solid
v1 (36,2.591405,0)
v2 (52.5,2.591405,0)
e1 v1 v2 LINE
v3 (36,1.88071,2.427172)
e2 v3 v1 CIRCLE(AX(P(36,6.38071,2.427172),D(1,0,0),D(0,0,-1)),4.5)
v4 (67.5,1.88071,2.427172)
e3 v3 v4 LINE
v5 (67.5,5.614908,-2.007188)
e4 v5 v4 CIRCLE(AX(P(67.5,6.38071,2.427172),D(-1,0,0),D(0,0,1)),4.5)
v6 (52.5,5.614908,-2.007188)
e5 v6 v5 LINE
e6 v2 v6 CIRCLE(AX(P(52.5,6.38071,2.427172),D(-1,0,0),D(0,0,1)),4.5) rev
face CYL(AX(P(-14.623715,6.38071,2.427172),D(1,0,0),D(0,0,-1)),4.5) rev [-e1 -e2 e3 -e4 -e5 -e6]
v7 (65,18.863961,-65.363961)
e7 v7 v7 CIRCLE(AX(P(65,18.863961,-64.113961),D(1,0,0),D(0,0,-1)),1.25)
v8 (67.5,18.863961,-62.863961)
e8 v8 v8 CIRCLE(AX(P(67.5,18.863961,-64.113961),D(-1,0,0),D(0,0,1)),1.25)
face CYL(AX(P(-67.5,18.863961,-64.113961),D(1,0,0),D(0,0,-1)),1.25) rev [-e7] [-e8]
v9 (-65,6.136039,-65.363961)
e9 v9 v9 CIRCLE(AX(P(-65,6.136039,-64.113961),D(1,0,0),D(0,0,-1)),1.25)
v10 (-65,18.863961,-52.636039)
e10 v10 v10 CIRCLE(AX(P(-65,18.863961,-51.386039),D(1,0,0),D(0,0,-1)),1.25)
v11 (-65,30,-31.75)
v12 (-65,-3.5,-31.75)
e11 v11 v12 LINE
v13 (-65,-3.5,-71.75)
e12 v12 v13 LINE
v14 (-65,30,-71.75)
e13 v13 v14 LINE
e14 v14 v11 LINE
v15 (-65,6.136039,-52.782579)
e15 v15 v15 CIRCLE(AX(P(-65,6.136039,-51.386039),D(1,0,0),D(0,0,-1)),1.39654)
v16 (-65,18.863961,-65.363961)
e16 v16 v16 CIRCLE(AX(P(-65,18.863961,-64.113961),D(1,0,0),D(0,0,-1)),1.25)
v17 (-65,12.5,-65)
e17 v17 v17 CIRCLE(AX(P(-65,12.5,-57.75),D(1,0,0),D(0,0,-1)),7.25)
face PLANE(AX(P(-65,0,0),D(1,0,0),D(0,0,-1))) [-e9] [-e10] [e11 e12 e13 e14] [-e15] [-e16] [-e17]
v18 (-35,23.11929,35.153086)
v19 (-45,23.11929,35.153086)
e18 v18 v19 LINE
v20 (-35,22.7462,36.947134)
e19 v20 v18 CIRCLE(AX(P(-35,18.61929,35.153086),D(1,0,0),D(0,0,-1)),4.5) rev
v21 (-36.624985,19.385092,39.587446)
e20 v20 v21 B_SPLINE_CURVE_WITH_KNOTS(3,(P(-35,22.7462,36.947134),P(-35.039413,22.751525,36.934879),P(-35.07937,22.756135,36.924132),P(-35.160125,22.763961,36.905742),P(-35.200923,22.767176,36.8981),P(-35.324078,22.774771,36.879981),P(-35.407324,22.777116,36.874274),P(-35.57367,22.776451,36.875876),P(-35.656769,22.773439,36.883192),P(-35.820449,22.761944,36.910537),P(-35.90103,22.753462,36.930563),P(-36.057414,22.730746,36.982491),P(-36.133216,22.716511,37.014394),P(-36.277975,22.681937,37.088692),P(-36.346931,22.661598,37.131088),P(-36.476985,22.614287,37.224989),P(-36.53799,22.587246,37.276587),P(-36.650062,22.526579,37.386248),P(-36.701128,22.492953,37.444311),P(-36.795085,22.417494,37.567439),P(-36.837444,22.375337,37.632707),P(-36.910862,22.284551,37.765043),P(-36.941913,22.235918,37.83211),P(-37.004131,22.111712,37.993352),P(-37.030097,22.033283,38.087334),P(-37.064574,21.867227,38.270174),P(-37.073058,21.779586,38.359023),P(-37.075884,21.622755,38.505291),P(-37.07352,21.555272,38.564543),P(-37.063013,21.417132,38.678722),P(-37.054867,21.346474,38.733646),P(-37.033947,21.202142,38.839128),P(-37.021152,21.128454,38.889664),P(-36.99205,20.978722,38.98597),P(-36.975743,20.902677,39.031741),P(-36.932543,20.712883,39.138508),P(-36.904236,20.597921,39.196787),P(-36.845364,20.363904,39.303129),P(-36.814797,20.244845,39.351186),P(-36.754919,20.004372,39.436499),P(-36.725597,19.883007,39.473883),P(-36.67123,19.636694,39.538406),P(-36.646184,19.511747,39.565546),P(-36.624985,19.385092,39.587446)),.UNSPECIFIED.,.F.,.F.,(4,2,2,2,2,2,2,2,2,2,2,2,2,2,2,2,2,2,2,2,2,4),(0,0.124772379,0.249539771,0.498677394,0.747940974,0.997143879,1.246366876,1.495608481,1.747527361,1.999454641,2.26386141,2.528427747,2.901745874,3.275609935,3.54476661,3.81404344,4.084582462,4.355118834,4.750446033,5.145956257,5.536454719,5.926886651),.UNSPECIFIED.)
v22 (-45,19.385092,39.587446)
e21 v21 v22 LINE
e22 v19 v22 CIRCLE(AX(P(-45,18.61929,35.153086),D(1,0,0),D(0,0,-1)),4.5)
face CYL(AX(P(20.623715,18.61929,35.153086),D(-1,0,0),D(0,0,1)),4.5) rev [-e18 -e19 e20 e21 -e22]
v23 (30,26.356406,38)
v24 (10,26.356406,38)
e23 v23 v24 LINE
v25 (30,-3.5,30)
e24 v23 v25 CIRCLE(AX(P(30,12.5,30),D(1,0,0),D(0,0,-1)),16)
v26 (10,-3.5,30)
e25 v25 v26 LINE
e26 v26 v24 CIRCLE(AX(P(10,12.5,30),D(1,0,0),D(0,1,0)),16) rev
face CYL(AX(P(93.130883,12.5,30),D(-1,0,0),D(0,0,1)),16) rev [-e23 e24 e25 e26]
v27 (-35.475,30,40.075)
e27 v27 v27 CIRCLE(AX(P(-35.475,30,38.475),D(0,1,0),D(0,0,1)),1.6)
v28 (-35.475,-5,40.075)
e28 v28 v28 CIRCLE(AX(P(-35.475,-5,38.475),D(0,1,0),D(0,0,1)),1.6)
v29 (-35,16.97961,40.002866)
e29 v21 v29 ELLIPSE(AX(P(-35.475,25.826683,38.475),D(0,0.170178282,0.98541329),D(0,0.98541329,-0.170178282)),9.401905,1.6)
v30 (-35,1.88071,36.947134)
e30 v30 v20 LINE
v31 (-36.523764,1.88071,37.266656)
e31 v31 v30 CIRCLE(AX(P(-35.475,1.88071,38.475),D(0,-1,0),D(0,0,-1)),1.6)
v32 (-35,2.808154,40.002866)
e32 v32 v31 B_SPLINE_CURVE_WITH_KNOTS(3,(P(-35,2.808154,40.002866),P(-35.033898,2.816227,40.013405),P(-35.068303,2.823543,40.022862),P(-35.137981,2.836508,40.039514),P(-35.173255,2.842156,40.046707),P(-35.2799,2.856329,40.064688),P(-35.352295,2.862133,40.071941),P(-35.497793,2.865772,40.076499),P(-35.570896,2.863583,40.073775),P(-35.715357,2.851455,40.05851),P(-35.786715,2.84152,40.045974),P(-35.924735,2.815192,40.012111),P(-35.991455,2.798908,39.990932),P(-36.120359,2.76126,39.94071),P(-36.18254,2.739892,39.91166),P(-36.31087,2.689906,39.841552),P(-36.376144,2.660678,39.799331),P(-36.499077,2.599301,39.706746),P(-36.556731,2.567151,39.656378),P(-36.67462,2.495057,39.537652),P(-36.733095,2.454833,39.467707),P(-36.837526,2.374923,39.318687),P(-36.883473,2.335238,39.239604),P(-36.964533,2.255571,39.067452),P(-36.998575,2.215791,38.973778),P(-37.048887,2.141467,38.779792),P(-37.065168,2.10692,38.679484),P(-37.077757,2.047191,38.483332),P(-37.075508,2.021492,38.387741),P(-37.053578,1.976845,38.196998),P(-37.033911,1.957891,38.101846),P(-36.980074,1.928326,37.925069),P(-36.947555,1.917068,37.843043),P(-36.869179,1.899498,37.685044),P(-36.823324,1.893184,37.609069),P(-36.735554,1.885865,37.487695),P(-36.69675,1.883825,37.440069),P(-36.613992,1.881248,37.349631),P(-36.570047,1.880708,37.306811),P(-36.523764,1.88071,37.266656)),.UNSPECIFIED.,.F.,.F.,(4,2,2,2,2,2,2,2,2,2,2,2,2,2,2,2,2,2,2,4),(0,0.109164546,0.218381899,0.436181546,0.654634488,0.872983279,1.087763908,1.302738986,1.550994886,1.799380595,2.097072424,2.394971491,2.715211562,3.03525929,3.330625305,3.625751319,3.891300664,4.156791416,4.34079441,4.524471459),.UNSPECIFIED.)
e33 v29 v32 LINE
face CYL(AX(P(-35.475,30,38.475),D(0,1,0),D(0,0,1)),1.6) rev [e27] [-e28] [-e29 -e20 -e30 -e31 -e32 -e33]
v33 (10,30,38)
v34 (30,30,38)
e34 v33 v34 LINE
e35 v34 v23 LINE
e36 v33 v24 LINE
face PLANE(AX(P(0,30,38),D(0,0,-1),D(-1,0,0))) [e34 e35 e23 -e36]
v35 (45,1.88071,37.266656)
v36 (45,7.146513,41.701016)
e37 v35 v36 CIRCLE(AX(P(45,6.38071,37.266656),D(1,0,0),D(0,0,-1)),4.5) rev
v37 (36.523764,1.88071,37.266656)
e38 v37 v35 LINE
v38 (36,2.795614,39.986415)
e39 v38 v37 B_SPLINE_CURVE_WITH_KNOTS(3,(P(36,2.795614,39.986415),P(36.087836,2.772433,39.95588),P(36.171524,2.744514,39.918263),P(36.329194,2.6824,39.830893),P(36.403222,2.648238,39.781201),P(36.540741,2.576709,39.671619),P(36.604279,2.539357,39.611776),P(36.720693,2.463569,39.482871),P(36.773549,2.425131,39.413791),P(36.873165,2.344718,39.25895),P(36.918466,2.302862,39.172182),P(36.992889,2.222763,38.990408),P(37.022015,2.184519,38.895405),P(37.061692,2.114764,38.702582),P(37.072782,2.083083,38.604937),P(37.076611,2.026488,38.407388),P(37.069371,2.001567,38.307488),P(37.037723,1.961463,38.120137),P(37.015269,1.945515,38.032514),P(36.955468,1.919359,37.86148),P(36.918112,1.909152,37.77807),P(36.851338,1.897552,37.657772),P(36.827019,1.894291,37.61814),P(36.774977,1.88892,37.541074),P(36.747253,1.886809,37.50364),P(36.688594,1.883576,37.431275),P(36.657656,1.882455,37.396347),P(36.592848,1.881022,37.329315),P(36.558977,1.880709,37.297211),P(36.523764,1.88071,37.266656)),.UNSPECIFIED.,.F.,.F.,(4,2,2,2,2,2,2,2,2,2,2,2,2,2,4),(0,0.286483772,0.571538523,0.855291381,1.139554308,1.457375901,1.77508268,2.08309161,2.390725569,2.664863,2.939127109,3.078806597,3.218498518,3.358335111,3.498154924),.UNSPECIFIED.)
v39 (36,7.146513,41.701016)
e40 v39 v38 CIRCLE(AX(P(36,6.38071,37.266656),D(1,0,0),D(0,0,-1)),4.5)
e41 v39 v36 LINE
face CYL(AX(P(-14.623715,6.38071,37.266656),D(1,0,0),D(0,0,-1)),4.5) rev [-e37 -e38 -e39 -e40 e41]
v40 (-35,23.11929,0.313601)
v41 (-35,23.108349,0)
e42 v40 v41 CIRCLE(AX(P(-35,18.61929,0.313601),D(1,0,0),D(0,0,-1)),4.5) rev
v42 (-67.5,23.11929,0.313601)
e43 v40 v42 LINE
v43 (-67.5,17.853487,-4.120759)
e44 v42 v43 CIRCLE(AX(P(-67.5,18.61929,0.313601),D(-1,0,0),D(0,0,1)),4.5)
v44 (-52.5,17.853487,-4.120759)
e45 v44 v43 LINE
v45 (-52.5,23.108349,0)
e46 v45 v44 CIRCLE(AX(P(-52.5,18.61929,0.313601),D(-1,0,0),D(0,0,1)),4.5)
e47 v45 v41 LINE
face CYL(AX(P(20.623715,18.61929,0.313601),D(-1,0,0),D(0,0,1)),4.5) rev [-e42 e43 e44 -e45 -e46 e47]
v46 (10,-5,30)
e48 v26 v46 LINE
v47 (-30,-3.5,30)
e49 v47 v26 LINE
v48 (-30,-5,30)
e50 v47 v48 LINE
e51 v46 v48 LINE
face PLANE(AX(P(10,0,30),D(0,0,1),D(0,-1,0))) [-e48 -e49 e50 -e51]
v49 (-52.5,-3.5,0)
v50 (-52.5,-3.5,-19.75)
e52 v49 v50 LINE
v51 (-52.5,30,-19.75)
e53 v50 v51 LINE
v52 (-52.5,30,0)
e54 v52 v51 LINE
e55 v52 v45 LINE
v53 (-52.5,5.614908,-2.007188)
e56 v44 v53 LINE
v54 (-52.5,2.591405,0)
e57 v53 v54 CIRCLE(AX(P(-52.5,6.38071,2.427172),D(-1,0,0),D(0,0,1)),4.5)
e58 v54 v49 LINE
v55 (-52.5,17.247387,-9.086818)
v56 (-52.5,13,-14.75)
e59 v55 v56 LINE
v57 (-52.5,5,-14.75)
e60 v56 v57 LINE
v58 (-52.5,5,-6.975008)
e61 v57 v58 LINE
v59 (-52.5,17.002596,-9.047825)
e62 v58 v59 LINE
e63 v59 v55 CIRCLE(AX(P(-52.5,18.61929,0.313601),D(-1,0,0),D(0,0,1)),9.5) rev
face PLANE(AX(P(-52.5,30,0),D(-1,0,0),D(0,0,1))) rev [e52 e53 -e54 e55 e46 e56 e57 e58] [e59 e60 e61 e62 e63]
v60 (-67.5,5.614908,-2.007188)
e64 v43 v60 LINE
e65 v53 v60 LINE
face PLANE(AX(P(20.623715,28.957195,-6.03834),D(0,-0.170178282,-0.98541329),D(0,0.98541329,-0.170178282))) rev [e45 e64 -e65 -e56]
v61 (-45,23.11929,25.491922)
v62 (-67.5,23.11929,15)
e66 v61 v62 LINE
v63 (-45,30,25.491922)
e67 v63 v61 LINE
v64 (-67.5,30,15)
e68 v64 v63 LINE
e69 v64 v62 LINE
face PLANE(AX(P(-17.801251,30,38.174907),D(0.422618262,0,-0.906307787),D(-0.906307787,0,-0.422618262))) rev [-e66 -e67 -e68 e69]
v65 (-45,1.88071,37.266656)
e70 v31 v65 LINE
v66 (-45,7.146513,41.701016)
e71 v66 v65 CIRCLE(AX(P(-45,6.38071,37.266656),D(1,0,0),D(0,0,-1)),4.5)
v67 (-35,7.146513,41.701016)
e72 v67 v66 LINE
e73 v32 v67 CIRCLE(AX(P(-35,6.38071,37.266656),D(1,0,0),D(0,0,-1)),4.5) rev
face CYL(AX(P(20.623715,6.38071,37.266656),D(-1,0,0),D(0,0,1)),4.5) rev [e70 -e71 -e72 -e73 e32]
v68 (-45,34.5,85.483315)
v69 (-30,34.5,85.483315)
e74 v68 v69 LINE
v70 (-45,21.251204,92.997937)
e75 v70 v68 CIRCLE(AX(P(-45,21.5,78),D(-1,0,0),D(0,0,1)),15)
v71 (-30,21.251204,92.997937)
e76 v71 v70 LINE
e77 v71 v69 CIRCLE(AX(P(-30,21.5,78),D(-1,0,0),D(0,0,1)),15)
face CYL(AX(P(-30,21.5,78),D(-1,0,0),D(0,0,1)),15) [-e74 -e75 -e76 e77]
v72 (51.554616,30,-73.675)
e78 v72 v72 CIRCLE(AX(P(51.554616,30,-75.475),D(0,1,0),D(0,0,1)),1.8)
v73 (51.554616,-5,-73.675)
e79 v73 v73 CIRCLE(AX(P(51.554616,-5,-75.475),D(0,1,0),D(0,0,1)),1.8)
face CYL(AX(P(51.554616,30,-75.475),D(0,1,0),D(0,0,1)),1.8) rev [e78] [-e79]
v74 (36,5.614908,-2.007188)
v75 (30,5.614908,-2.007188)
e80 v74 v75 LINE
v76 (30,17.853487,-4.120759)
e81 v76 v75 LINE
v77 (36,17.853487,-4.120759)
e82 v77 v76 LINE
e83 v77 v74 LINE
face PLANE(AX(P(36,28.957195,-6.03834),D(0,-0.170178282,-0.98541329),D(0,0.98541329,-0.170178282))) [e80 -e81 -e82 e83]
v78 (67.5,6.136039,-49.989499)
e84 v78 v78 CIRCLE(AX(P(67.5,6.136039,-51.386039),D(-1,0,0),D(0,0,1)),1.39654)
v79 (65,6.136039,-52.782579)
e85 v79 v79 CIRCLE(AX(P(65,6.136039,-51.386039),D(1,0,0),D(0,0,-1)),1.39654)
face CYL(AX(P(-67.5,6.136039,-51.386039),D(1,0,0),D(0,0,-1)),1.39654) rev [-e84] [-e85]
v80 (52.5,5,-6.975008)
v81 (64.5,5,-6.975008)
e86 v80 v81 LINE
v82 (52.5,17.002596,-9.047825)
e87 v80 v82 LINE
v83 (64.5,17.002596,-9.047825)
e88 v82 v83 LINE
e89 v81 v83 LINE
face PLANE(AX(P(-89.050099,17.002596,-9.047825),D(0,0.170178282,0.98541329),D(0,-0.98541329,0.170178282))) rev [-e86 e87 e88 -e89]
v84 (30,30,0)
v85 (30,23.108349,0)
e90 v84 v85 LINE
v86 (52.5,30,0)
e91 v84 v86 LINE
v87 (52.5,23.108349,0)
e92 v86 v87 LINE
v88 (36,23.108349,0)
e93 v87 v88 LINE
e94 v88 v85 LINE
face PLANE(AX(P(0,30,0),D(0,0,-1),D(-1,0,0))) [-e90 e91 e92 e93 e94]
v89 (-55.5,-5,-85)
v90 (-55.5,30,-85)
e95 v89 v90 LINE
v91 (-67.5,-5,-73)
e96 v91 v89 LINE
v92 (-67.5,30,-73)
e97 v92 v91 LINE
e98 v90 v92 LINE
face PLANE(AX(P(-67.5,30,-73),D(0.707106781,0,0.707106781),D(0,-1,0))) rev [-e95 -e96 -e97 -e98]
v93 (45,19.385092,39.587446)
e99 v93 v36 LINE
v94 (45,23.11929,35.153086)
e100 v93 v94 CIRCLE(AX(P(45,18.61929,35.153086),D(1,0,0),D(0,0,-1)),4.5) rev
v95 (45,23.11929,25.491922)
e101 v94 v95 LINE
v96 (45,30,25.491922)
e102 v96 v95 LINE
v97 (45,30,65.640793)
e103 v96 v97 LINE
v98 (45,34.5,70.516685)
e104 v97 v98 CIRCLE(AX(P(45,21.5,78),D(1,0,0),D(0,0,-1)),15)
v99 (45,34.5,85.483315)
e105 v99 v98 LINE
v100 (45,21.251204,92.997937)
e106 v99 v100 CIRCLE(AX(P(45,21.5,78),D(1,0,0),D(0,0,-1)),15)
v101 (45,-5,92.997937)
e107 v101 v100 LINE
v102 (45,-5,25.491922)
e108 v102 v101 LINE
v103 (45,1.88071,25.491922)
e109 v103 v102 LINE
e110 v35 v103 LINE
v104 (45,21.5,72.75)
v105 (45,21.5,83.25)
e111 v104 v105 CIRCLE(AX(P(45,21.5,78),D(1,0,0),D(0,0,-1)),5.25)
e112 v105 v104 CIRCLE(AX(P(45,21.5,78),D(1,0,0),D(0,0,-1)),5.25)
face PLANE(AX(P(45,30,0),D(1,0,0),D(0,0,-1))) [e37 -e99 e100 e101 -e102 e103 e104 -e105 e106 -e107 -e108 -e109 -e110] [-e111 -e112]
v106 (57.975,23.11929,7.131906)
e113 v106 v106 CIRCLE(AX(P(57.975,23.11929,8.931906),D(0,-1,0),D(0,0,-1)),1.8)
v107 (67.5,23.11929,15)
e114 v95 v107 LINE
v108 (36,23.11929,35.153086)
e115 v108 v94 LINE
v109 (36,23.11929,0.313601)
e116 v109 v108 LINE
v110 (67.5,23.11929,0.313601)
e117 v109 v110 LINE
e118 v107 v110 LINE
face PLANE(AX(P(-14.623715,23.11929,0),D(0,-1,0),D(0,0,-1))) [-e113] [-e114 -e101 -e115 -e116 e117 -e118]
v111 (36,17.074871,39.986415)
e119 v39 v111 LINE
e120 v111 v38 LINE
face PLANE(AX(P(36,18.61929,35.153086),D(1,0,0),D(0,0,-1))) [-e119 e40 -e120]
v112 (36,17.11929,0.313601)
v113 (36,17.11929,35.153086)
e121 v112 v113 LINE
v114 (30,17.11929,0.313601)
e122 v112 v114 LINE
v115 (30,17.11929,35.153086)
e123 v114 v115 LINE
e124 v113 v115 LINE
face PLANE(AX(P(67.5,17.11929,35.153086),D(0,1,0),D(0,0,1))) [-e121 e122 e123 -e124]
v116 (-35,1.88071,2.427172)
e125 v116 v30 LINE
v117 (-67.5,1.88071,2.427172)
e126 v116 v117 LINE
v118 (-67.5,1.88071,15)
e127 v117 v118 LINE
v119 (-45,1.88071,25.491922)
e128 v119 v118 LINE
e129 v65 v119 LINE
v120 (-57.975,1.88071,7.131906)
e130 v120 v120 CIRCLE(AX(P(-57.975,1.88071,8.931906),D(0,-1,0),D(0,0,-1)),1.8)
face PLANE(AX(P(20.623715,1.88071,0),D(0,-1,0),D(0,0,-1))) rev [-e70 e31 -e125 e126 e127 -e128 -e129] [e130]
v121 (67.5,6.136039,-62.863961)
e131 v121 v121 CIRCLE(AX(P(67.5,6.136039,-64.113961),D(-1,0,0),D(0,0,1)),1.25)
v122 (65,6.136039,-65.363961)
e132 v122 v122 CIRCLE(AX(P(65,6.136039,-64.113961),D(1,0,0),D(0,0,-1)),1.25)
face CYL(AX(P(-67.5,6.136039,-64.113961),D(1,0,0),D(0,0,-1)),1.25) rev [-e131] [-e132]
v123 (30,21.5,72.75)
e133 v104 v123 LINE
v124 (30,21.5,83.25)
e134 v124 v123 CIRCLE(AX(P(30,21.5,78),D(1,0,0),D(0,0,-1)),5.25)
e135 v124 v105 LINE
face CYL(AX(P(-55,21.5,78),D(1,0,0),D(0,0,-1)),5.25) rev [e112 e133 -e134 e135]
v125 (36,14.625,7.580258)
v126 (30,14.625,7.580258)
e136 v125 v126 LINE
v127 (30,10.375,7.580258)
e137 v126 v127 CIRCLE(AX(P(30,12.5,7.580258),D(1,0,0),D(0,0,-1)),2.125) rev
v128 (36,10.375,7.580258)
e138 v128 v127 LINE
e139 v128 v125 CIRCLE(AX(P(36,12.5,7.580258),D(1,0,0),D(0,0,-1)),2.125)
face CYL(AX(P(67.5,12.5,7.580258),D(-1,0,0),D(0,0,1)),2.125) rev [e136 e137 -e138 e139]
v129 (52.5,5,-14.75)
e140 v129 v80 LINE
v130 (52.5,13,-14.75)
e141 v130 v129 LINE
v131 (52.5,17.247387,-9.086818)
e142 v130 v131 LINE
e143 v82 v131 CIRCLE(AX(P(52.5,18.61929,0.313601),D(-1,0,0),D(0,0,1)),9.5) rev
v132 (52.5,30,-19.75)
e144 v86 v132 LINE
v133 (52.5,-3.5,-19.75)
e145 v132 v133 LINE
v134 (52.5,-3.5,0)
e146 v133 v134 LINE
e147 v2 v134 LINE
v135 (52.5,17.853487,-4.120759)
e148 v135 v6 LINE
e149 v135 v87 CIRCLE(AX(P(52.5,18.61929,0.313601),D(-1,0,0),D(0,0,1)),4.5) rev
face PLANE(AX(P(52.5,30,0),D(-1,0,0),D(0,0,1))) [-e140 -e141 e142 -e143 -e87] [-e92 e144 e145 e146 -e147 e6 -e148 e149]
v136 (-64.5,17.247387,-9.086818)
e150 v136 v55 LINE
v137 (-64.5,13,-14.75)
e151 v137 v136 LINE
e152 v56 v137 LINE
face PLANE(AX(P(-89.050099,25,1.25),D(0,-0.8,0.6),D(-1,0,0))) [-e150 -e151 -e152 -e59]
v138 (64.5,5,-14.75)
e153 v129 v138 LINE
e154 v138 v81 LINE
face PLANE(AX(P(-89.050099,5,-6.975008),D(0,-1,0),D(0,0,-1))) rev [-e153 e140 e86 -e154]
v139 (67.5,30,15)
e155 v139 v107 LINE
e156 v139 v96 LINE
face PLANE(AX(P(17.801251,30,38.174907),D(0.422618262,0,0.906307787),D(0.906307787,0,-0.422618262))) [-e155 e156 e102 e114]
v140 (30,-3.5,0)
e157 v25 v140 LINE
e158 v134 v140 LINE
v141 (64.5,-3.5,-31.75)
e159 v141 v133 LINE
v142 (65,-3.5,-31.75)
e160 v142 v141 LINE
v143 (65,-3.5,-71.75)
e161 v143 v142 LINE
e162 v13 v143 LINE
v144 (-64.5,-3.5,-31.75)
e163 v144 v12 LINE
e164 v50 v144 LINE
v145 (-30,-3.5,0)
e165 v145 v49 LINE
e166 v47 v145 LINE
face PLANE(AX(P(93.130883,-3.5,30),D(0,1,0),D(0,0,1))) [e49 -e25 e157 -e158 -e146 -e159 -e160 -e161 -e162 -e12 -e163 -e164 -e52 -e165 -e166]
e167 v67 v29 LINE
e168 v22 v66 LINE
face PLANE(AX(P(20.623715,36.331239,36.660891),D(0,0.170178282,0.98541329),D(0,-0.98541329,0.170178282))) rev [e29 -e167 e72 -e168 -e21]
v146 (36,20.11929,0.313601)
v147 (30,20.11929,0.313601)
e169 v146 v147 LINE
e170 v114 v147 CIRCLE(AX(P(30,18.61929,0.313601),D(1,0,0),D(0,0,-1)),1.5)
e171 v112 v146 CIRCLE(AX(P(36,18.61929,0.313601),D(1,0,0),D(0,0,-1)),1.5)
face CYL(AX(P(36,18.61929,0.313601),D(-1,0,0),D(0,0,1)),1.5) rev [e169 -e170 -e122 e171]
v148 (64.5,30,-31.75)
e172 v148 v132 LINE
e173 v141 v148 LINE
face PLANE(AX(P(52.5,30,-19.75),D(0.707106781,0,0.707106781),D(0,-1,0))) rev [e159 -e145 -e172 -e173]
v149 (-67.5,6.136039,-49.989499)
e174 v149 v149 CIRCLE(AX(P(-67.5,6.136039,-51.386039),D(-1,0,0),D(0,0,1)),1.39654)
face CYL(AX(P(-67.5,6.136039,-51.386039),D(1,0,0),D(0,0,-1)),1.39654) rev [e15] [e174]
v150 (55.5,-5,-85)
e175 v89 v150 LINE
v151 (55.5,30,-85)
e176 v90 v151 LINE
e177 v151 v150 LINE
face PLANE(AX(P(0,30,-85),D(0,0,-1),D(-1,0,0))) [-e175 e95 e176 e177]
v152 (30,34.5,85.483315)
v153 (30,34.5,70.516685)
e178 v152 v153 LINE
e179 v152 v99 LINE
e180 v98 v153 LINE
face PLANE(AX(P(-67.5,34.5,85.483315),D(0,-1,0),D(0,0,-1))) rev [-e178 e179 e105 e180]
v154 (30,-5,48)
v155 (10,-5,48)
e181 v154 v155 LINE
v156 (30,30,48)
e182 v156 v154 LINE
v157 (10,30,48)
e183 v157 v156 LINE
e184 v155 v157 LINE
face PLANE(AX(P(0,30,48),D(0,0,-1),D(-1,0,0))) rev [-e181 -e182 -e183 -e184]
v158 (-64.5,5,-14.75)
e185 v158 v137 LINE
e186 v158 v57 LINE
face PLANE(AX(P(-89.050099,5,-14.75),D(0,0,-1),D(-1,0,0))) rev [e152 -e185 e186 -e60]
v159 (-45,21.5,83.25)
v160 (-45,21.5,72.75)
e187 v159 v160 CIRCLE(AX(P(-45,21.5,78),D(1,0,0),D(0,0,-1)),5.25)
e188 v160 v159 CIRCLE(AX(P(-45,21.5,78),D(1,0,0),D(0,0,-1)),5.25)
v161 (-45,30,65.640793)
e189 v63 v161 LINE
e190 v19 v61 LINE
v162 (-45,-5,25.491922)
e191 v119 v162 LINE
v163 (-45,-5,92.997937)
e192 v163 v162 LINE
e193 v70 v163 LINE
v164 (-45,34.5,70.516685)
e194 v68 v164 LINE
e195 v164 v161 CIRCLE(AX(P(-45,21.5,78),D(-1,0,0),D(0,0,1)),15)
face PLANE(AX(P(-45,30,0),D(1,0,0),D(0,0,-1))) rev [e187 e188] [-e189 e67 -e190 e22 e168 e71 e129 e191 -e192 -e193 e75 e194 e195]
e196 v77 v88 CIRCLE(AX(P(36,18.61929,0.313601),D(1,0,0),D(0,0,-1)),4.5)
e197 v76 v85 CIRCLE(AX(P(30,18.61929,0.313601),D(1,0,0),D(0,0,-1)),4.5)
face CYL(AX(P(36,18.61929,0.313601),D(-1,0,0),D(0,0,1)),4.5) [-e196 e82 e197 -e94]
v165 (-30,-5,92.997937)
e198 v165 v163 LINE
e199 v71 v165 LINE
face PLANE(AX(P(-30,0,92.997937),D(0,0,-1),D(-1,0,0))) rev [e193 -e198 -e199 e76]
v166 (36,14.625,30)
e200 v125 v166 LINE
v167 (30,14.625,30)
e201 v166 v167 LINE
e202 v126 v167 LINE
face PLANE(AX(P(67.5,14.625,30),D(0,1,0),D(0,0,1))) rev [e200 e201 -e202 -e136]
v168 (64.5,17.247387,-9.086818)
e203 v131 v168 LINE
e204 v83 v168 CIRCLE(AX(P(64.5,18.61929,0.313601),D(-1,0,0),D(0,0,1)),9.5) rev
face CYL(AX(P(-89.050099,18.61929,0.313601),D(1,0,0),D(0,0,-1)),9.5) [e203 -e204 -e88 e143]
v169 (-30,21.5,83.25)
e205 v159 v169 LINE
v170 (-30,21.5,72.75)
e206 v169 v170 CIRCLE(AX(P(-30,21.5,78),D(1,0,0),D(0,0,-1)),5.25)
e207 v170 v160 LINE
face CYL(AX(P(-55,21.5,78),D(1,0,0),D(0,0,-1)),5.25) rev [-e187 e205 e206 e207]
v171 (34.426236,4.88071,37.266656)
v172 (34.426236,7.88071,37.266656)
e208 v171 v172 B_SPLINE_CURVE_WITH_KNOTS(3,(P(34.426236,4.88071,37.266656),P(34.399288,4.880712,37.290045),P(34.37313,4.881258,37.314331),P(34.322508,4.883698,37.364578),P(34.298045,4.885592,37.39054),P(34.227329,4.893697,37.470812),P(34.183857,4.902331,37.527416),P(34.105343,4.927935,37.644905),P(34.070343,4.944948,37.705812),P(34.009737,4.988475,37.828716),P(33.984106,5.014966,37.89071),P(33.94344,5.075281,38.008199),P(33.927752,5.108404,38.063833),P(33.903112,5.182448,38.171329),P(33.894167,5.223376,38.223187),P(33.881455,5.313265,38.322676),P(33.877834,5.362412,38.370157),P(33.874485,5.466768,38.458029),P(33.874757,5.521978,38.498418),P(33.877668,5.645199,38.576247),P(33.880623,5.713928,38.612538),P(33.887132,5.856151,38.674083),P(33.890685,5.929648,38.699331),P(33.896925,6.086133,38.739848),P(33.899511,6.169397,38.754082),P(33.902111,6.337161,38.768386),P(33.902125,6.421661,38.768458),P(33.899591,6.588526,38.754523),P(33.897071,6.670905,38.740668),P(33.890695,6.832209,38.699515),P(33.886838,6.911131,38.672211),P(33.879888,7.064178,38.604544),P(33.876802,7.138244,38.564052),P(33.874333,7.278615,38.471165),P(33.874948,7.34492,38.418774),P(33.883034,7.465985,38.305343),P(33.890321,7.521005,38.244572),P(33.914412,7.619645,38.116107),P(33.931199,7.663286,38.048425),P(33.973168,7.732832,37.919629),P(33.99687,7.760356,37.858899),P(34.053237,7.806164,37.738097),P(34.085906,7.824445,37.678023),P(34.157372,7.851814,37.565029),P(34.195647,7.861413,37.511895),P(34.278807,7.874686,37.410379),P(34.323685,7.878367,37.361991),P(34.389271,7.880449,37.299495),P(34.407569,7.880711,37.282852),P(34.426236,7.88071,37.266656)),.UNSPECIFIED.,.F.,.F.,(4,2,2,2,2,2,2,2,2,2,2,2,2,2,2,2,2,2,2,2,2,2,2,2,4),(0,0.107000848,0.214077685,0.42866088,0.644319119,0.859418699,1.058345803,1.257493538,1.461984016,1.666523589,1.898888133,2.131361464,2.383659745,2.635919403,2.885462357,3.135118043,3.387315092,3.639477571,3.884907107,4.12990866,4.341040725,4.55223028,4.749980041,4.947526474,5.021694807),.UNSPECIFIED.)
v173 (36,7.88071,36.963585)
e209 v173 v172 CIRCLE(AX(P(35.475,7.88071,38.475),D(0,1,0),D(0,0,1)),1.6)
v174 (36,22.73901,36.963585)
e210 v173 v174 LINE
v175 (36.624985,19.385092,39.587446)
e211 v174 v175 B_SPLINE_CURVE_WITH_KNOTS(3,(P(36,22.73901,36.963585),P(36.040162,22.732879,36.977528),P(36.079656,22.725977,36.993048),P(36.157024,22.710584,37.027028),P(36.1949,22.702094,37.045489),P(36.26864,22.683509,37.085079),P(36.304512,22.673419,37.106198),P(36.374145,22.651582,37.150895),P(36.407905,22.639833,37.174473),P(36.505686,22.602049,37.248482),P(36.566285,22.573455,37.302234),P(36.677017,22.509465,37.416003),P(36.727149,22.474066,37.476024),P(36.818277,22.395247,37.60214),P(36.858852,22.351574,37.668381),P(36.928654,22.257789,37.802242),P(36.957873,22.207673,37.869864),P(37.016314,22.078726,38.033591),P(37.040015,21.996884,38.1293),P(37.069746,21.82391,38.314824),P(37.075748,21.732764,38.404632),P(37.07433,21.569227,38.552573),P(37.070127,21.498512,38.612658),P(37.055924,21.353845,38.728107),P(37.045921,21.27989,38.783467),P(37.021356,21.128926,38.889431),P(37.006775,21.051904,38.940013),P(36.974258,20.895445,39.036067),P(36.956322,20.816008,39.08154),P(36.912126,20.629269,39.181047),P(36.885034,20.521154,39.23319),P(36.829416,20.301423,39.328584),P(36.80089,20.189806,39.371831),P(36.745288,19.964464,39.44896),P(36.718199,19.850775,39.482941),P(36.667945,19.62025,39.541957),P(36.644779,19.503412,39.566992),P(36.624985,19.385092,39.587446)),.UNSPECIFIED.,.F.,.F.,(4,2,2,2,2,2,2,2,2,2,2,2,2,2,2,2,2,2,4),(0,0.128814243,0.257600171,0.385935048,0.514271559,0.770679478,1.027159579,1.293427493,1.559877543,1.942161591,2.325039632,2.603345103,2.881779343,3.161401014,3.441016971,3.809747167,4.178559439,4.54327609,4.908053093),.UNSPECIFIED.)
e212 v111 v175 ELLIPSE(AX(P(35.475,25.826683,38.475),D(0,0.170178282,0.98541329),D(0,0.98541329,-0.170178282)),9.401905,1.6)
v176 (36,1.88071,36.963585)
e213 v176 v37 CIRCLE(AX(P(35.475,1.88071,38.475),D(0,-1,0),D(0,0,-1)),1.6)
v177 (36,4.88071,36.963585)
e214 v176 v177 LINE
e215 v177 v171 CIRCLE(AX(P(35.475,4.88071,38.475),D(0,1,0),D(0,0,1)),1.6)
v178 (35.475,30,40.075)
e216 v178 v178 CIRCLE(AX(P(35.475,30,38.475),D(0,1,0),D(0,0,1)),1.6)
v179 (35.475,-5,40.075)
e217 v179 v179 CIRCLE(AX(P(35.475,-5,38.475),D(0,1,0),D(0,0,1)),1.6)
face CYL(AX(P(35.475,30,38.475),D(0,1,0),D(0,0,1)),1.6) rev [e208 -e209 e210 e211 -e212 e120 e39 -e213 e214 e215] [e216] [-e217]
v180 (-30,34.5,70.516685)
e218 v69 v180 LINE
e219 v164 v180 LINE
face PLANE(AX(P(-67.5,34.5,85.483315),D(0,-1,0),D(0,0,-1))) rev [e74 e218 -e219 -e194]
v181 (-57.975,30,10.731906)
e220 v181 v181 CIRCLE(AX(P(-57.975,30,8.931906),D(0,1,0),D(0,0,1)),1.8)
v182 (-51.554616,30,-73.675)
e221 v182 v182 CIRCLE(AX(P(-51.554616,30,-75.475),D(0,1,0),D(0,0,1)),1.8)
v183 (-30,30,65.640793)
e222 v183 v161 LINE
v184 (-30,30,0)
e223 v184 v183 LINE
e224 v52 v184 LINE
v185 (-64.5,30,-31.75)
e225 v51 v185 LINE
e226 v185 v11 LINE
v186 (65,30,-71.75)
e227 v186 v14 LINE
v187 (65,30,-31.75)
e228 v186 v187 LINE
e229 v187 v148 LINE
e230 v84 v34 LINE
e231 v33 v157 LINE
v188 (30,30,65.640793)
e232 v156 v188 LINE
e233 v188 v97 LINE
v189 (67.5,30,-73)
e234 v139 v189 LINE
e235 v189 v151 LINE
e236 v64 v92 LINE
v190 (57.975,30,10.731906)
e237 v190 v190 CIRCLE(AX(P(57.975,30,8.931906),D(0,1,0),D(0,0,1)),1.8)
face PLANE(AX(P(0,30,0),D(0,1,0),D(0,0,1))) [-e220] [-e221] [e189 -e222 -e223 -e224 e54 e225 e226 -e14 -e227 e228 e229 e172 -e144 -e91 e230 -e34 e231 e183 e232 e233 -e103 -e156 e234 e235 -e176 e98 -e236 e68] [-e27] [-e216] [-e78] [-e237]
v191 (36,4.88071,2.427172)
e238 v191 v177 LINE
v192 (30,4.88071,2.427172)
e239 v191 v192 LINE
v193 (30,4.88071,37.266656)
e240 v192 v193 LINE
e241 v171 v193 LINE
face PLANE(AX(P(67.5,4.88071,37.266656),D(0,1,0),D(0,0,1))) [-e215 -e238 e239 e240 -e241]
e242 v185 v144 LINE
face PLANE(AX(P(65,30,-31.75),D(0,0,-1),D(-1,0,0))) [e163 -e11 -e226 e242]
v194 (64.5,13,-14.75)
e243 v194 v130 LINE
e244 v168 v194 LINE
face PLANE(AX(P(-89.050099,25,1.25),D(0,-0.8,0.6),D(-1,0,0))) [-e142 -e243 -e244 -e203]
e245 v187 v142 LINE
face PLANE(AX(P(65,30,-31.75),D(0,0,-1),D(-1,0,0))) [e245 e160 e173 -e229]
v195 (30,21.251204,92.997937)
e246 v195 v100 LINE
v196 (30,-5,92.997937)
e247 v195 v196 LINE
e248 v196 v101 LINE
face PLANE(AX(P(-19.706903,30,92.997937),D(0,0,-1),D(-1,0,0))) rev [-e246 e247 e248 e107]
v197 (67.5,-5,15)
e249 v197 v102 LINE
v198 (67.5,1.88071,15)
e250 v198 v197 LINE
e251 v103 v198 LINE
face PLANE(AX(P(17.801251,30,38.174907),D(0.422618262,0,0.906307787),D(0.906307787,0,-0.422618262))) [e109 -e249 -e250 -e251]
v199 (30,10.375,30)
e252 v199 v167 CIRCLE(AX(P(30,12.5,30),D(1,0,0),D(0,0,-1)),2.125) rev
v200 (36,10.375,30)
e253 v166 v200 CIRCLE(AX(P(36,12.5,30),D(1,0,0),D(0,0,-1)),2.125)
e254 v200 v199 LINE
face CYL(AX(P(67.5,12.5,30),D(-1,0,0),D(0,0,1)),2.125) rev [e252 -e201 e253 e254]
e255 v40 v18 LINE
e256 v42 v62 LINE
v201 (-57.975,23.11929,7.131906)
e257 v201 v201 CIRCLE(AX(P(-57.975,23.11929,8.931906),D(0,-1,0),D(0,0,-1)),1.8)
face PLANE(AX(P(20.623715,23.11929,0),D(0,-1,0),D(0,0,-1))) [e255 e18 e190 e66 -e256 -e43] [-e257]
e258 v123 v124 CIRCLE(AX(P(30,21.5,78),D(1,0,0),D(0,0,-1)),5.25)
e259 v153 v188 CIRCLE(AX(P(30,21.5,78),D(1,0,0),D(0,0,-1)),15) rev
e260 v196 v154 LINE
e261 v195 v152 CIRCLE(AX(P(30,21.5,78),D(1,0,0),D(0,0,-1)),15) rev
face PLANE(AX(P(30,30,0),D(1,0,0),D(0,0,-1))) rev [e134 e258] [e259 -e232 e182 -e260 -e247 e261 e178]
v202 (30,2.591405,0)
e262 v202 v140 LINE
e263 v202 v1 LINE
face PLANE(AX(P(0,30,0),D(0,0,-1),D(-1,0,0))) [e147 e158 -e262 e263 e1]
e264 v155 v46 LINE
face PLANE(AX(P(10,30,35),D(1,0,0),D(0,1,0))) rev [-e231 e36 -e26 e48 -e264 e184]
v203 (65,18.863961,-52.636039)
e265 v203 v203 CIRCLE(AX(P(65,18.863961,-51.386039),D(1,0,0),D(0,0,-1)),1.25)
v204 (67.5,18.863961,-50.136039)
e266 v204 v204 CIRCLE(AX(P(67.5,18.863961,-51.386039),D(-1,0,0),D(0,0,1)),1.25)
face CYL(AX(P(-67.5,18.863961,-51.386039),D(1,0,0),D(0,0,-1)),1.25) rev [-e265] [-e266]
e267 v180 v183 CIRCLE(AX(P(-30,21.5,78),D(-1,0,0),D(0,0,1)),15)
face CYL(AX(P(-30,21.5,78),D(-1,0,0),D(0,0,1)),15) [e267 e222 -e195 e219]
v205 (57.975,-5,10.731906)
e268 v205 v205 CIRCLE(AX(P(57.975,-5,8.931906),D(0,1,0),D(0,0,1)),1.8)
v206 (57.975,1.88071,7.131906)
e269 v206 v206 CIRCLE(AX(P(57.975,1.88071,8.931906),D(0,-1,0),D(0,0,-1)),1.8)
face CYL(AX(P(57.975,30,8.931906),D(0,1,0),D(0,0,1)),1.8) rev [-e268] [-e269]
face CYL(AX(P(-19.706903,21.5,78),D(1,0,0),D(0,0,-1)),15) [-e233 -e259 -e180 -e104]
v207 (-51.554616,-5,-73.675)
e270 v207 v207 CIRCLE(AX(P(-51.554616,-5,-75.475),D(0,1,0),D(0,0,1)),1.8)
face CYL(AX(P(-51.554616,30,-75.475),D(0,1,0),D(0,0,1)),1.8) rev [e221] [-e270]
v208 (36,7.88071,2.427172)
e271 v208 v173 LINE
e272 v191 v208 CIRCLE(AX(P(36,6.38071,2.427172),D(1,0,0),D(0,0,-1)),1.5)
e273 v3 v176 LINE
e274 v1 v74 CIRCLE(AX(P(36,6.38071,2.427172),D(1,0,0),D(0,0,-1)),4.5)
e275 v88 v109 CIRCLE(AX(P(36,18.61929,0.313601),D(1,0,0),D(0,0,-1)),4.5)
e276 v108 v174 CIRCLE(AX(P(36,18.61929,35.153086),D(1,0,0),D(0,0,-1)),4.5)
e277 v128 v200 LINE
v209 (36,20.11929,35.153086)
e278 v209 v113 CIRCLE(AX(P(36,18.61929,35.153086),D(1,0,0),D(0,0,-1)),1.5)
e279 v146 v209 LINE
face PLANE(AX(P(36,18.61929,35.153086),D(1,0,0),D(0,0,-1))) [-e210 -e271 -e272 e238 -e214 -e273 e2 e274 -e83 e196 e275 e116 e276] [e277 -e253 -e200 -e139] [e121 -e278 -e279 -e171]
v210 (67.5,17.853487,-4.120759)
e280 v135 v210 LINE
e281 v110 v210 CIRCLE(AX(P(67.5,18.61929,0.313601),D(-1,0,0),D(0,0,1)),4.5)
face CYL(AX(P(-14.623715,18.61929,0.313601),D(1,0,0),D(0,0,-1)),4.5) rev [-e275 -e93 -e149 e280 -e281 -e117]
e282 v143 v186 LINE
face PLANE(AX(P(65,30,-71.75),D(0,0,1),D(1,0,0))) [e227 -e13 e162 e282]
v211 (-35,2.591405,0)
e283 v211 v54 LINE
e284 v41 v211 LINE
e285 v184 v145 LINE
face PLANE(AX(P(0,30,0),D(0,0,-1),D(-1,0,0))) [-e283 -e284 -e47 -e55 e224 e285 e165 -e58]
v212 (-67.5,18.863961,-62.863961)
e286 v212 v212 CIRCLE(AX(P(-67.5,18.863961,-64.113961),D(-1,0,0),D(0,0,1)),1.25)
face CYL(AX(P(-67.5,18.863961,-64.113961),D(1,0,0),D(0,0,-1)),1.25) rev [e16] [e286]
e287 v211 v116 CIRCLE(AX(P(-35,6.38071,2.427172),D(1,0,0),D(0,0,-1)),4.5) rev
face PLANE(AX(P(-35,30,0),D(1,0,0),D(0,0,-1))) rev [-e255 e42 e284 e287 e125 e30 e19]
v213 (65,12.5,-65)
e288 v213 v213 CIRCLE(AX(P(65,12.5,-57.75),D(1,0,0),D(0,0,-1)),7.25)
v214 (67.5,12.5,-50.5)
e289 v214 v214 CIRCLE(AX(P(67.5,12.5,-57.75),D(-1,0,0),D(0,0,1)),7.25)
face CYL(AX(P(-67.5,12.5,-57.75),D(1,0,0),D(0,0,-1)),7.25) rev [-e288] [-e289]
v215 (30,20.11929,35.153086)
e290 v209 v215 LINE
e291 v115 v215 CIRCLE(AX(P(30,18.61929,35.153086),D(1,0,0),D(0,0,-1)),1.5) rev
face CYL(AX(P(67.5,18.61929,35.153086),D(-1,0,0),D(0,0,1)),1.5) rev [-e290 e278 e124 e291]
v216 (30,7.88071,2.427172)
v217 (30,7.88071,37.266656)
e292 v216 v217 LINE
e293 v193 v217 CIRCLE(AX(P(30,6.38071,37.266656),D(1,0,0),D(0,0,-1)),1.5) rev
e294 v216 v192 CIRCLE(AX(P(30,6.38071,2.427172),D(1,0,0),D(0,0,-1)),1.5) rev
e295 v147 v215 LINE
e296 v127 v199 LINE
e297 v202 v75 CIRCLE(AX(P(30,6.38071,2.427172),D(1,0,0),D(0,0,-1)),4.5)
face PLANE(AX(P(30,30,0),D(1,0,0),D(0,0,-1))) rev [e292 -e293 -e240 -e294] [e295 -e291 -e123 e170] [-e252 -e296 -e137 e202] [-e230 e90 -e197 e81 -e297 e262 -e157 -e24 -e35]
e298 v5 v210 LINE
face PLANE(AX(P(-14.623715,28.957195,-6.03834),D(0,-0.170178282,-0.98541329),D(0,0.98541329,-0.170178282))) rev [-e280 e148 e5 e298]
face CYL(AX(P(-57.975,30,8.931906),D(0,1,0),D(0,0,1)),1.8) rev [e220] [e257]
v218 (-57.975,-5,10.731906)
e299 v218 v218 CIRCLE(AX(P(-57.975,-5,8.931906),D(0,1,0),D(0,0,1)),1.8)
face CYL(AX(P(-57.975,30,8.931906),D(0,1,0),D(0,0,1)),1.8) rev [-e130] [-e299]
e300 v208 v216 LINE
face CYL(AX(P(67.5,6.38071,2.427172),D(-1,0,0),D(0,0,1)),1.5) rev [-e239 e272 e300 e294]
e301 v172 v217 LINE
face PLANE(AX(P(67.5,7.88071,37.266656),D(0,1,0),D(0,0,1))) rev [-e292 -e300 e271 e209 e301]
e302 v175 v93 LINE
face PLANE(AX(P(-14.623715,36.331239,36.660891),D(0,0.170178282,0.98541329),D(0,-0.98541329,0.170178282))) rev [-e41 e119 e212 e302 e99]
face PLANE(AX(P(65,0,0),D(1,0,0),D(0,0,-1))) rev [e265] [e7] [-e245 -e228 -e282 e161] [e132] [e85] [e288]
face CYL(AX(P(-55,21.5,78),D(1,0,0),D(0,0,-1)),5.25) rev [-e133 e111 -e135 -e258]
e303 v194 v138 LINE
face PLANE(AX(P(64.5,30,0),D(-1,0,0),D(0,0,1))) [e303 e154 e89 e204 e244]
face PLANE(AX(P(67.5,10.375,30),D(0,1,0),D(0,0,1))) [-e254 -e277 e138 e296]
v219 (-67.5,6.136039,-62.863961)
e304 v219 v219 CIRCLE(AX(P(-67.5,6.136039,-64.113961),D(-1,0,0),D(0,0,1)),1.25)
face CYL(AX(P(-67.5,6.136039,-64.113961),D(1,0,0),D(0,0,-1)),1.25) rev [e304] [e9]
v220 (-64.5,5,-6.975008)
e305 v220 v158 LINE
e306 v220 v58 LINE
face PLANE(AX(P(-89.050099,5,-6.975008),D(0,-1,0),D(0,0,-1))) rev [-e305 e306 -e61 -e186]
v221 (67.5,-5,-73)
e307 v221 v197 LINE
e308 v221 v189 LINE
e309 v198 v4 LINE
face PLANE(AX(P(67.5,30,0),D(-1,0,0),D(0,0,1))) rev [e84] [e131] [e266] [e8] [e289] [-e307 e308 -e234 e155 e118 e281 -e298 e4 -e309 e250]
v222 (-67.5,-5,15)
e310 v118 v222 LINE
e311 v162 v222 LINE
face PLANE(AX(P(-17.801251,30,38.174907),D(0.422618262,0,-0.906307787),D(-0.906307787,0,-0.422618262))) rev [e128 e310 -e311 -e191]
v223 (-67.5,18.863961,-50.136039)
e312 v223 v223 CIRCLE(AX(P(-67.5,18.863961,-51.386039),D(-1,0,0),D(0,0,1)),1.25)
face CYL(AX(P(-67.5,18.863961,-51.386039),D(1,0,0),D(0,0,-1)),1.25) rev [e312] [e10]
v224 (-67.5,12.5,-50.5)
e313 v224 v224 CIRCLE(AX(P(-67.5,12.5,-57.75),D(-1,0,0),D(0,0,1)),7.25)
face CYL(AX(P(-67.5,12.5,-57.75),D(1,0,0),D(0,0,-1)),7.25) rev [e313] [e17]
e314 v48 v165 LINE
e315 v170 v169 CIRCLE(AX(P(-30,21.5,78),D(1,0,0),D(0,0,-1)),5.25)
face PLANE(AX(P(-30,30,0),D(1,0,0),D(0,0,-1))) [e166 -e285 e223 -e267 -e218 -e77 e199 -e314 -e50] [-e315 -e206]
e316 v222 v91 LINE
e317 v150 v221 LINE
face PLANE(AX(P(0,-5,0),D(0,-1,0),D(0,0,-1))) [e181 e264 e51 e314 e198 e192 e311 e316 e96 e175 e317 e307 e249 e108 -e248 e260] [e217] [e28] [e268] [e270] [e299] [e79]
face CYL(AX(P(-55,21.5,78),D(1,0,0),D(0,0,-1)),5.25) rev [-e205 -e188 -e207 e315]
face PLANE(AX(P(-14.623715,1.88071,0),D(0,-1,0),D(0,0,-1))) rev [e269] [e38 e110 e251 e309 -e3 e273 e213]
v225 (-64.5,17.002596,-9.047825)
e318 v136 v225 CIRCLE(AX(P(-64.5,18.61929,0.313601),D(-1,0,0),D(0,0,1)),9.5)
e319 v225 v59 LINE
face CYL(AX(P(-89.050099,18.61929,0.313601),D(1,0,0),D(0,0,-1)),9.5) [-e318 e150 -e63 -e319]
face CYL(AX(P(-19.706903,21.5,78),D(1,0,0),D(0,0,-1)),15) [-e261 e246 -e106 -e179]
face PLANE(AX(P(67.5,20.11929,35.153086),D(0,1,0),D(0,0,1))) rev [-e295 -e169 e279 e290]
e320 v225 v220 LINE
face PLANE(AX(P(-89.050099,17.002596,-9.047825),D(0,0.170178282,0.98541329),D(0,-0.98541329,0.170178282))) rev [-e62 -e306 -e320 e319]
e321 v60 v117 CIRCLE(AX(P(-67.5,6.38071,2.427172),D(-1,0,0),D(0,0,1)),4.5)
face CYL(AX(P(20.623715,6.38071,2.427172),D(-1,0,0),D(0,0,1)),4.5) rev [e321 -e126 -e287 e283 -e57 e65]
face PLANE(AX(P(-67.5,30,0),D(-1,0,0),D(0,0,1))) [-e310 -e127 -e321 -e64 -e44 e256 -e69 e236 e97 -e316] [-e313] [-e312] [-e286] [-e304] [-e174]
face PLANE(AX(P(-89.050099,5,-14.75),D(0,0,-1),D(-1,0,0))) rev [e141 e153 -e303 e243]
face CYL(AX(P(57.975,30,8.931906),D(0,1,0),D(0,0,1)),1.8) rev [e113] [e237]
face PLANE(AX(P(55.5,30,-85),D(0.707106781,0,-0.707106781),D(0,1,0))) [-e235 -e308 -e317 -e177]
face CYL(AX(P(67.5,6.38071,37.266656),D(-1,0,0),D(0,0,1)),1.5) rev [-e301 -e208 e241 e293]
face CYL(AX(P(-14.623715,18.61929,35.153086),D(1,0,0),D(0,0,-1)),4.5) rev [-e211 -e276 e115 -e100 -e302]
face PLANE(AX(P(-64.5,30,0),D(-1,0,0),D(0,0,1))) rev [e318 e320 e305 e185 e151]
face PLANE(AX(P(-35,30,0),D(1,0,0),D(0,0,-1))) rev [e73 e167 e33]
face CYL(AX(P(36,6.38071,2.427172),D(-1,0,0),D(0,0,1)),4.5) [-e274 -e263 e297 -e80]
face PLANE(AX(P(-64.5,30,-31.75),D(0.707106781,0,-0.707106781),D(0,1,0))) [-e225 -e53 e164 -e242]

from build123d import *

# Parameters (mm, degrees)
BOSS_EXTRUDE1_DEPTH      = 30
BOSS_EXTRUDE2_DEPTH      = 5
BOSS_EXTRUDE3_DEPTH      = 15
BOSS_EXTRUDE6_START      = -75
BOSS_EXTRUDE6_DEPTH      = 15
CUT_EXTRUDE17_DEPTH      = 121.571555518
CUT_EXTRUDE17_DEPTH_BACK = 121.571555518
SKETCH5_R                = 5.25
CUT_EXTRUDE1_DEPTH       = 100
SKETCH6_W                = 40
SKETCH6_H                = 30
CUT_EXTRUDE2_DEPTH       = 13
CUT_EXTRUDE5_DEPTH       = 156.689595028
CUT_EXTRUDE5_DEPTH_BACK  = 156.689595028
SKETCH11_R               = 1.25
SKETCH11_R_2             = 1.396539859
SKETCH11_R_3             = 7.25
CUT_EXTRUDE6_DEPTH       = 65
CUT_EXTRUDE6_DEPTH_BACK  = 65
SKETCH12_W               = 40
SKETCH12_H               = 30
BOSS_EXTRUDE7_START      = 30
BOSS_EXTRUDE7_DEPTH      = 6
CUT_EXTRUDE7_DEPTH       = 120.981248535
CUT_EXTRUDE9_START       = 36
CUT_EXTRUDE9_DEPTH       = 31.5
CUT_EXTRUDE10_DEPTH      = 30
CUT_EXTRUDE11_START      = -67.5
CUT_EXTRUDE11_DEPTH      = 32.5
CHAMFER1_SIZE            = 12
CUT_EXTRUDE12_DEPTH      = 64.5
CUT_EXTRUDE12_DEPTH_BACK = 64.5
CHAMFER2_SIZE            = 16
CHAMFER2_SIZE_2          = 12
CUT_EXTRUDE14_START      = -3.5
CUT_EXTRUDE14_DEPTH      = 3.5
CUT_EXTRUDE15_START      = -30
CUT_EXTRUDE15_DEPTH      = 40
M3_CLEARANCE_HOLE2_D     = 3.6
M3_CLEARANCE_HOLE3_D     = 3.2


with BuildPart() as part:
    # Sketch1 → Boss-Extrude1 (new body)
    with BuildSketch(Plane(origin=(0, 0, 0), x_dir=(1, 0, 0), z_dir=(0, 1, 0))):
        Polygon((-30, -78), (-30, -48), (30, -48), (30, -78), (45, -78), (45, -25.491922308), (67.5, -15), (67.5, 85), (-67.5, 85), (-67.5, -15), (-45, -25.491922308), (-45, -78), align=None)
        Polygon((-30, -38), (-30, 0), (-52.5, 0), (-52.5, 70), (52.5, 70), (52.5, 0), (30, 0), (30, -38), align=None, mode=Mode.SUBTRACT)
    extrude(amount=BOSS_EXTRUDE1_DEPTH)

    # Sketch2 → Boss-Extrude2 (add)
    with BuildSketch(Plane.XZ):
        Polygon((67.5, 15), (45, 25.491922308), (45, 78), (30, 78), (30, 48), (-30, 48), (-30, 78), (-45, 78), (-45, 25.491922308), (-67.5, 15), (-67.5, -85), (67.5, -85), align=None)
    extrude(amount=BOSS_EXTRUDE2_DEPTH)

    # Sketch3 → Boss-Extrude3 (add)
    with BuildSketch(Plane.ZY.offset(45)):
        with BuildLine():
            Line((65.640792906, 30), (78, 30))
            Line((78, 30), (78, 26.5))
            ThreePointArc((78, 26.5), (81.535533906, 25.035533906), (83, 21.5))
            ThreePointArc((83, 21.5), (81.535533906, 17.964466094), (78, 16.5))
            Line((78, 16.5), (78, -5))
            Line((78, -5), (92.997936538, -5))
            Line((92.997936538, -5), (92.997936538, 21.251203686))
            ThreePointArc((92.997936538, 21.251203686), (82.569035183, 35.787194179), (65.640792906, 30))
        make_face()
    extrude(amount=-BOSS_EXTRUDE3_DEPTH)

    # Sketch3<3> → Boss-Extrude6 (add)
    with BuildSketch(Plane.ZY.offset(45).offset(BOSS_EXTRUDE6_START)):
        with BuildLine():
            Line((65.640792906, 30), (78, 30))
            Line((78, 30), (78, 26.5))
            ThreePointArc((78, 26.5), (81.535533906, 25.035533906), (83, 21.5))
            ThreePointArc((83, 21.5), (81.535533906, 17.964466094), (78, 16.5))
            Line((78, 16.5), (78, -5))
            Line((78, -5), (92.997936538, -5))
            Line((92.997936538, -5), (92.997936538, 21.251203686))
            ThreePointArc((92.997936538, 21.251203686), (82.569035183, 35.787194179), (65.640792906, 30))
        make_face()
    extrude(amount=-BOSS_EXTRUDE6_DEPTH)

    # Sketch40 → Cut-Extrude17 (cut, two sides: drawn at the far end of the back side and taken through both)
    with BuildSketch(Plane(origin=(0, 0, 0), x_dir=(0, 0, -1), z_dir=(1, 0, 0)).offset(-CUT_EXTRUDE17_DEPTH_BACK)):
        with BuildLine():
            Line((-85.483314774, 34.5), (-70.516685226, 34.5))
            ThreePointArc((-70.516685226, 34.5), (-78, 36.5), (-85.483314774, 34.5))
        make_face()
    extrude(amount=CUT_EXTRUDE17_DEPTH + CUT_EXTRUDE17_DEPTH_BACK, mode=Mode.SUBTRACT)

    # Sketch5 → Cut-Extrude1 (cut)
    with BuildSketch(Plane(origin=(45, 0, 0), x_dir=(0, 0, -1), z_dir=(1, 0, 0))):
        with Locations((-78, 21.5)):
            Circle(SKETCH5_R)
    extrude(amount=-CUT_EXTRUDE1_DEPTH, mode=Mode.SUBTRACT)

    # Sketch6 → Cut-Extrude2 (cut)
    with BuildSketch(Plane.XY.offset(48)):
        with Locations((-10, 15)):
            Rectangle(SKETCH6_W, SKETCH6_H)
    extrude(amount=-CUT_EXTRUDE2_DEPTH, mode=Mode.SUBTRACT)

    # Sketch11 → Cut-Extrude5 (cut, two sides: drawn at the far end of the back side and taken through both)
    with BuildSketch(Plane.ZY.offset(-52.5).offset(-CUT_EXTRUDE5_DEPTH_BACK)):
        with Locations((-51.386038969, 18.863961031)):
            Circle(SKETCH11_R)
        with Locations((-51.386038969, 6.136038969)):
            Circle(SKETCH11_R_2)
        with Locations((-64.113961031, 6.136038969)):
            Circle(SKETCH11_R)
        with Locations((-57.75, 12.5)):
            Circle(SKETCH11_R_3)
        with Locations((-64.113961031, 18.863961031)):
            Circle(SKETCH11_R)
    extrude(amount=CUT_EXTRUDE5_DEPTH + CUT_EXTRUDE5_DEPTH_BACK, mode=Mode.SUBTRACT)

    # Sketch12 → Cut-Extrude6 (cut, two sides: drawn at the far end of the back side and taken through both)
    with BuildSketch(Plane(origin=(0, 0, 0), x_dir=(0, 0, -1), z_dir=(1, 0, 0)).offset(-CUT_EXTRUDE6_DEPTH_BACK)):
        with Locations((51.75, 15)):
            Rectangle(SKETCH12_W, SKETCH12_H)
    extrude(amount=CUT_EXTRUDE6_DEPTH + CUT_EXTRUDE6_DEPTH_BACK, mode=Mode.SUBTRACT)

    # Boss-Extrude7: read off the stored shape, not the designer's step
    # Boss-Extrude7 outline → Boss-Extrude7 (add)
    with BuildSketch(Plane.YZ.offset(BOSS_EXTRUDE7_START)):
        with BuildLine():
            ThreePointArc((2.591404725, 0), (3.891844576, -1.321901111), (5.614908146, -2.00718812))
            Line((5.614908146, -2.00718812), (17.853487316, -4.120758536))
            ThreePointArc((17.853487316, -4.120758536), (21.396126568, -3.227468677), (23.108348979, 0))
            Line((23.108348979, 0), (20.086141399, 0))
            ThreePointArc((20.086141399, 0), (18.619289585, -1.18639873), (17.152437771, 0))
            Line((17.152437771, 0), (2.591404725, 0))
        make_face()
    extrude(amount=BOSS_EXTRUDE7_DEPTH)

    # Sketch20<3> (on Right Plane) → Cut-Extrude7 (cut, through all)
    with BuildSketch(Plane(origin=(0, 0, 0), x_dir=(0, 0, -1), z_dir=(1, 0, 0))):
        with BuildLine():
            Line((-30, 14.625), (-7.580257652, 14.625))
            ThreePointArc((-7.580257652, 14.625), (-5.455257652, 12.5), (-7.580257652, 10.375))
            Line((-7.580257652, 10.375), (-30, 10.375))
            ThreePointArc((-30, 10.375), (-32.125, 12.5), (-30, 14.625))
        make_face()
        with BuildLine():
            Line((-35.153085966, 20.119289585), (-0.31360127, 20.119289585))
            ThreePointArc((-0.31360127, 20.119289585), (1.18639873, 18.619289585), (-0.31360127, 17.119289585))
            Line((-0.31360127, 17.119289585), (-35.153085966, 17.119289585))
            ThreePointArc((-35.153085966, 17.119289585), (-36.653085966, 18.619289585), (-35.153085966, 20.119289585))
        make_face()
        with BuildLine():
            Line((-37.266656382, 7.880710415), (-2.427171685, 7.880710415))
            ThreePointArc((-2.427171685, 7.880710415), (-0.927171685, 6.380710415), (-2.427171685, 4.880710415))
            Line((-2.427171685, 4.880710415), (-37.266656382, 4.880710415))
            ThreePointArc((-37.266656382, 4.880710415), (-38.766656382, 6.380710415), (-37.266656382, 7.880710415))
        make_face()
    extrude(amount=CUT_EXTRUDE7_DEPTH, mode=Mode.SUBTRACT)

    # Cut-Extrude9: read off the stored shape, not the designer's step
    # Cut-Extrude9 outline → Cut-Extrude9 (cut)
    with BuildSketch(Plane.YZ.offset(CUT_EXTRUDE9_START)):
        with BuildLine():
            ThreePointArc((23.119289585, 35.153085966), (22.061389976, 38.051696822), (19.385091854, 39.587445772))
            Line((19.385091854, 39.587445772), (7.146512684, 41.701016188))
            ThreePointArc((7.146512684, 41.701016188), (3.482099559, 40.708756774), (1.880710415, 37.266656382))
            Line((1.880710415, 37.266656382), (1.880710415, 2.427171685))
            ThreePointArc((1.880710415, 2.427171685), (2.938610024, -0.471439171), (5.614908146, -2.00718812))
            Line((5.614908146, -2.00718812), (17.853487316, -4.120758536))
            ThreePointArc((17.853487316, -4.120758536), (21.517900441, -3.128499122), (23.119289585, 0.31360127))
            Line((23.119289585, 0.31360127), (23.119289585, 35.153085966))
        make_face()
        with BuildLine():
            ThreePointArc((20.119289585, 0.31360127), (18.619289585, -1.18639873), (17.119289585, 0.31360127))
            Line((17.119289585, 0.31360127), (17.119289585, 35.153085966))
            ThreePointArc((17.119289585, 35.153085966), (18.619289585, 36.653085966), (20.119289585, 35.153085966))
            Line((20.119289585, 35.153085966), (20.119289585, 0.31360127))
        make_face(mode=Mode.SUBTRACT)
        with BuildLine():
            Line((7.880710415, 37.266656382), (7.880710415, 2.427171685))
            ThreePointArc((7.880710415, 2.427171685), (6.380710415, 0.927171685), (4.880710415, 2.427171685))
            Line((4.880710415, 2.427171685), (4.880710415, 37.266656382))
            ThreePointArc((4.880710415, 37.266656382), (6.380710415, 38.766656382), (7.880710415, 37.266656382))
        make_face(mode=Mode.SUBTRACT)
        with BuildLine():
            Line((14.625, 30), (14.625, 7.580257652))
            ThreePointArc((14.625, 7.580257652), (12.5, 5.455257652), (10.375, 7.580257652))
            Line((10.375, 7.580257652), (10.375, 30))
            ThreePointArc((10.375, 30), (12.5, 32.125), (14.625, 30))
        make_face(mode=Mode.SUBTRACT)
    extrude(amount=CUT_EXTRUDE9_DEPTH, mode=Mode.SUBTRACT)

    # Sketch20<7> (on Right Plane) → Cut-Extrude10 (cut)
    with BuildSketch(Plane(origin=(0, 0, 0), x_dir=(0, 0, -1), z_dir=(1, 0, 0))):
        with BuildLine():
            Line((-30, 28.5), (-7.580257652, 28.5))
            ThreePointArc((-7.580257652, 28.5), (8.419742348, 12.5), (-7.580257652, -3.5))
            Line((-7.580257652, -3.5), (-30, -3.5))
            ThreePointArc((-30, -3.5), (-46, 12.5), (-30, 28.5))
        make_face()
    extrude(amount=CUT_EXTRUDE10_DEPTH, mode=Mode.SUBTRACT)

    # Cut-Extrude11: read off the stored shape, not the designer's step
    # Cut-Extrude11 outline → Cut-Extrude11 (cut)
    with BuildSketch(Plane.YZ.offset(CUT_EXTRUDE11_START)):
        with BuildLine():
            ThreePointArc((23.119289585, 35.153085966), (22.061389976, 38.051696822), (19.385091854, 39.587445772))
            Line((19.385091854, 39.587445772), (7.146512684, 41.701016188))
            ThreePointArc((7.146512684, 41.701016188), (3.482099559, 40.708756774), (1.880710415, 37.266656382))
            Line((1.880710415, 37.266656382), (1.880710415, 2.427171685))
            ThreePointArc((1.880710415, 2.427171685), (2.938610024, -0.471439171), (5.614908146, -2.00718812))
            Line((5.614908146, -2.00718812), (17.853487316, -4.120758536))
            ThreePointArc((17.853487316, -4.120758536), (21.517900441, -3.128499122), (23.119289585, 0.31360127))
            Line((23.119289585, 0.31360127), (23.119289585, 35.153085966))
        make_face()
    extrude(amount=CUT_EXTRUDE11_DEPTH, mode=Mode.SUBTRACT)

    # Chamfer1
    chamfer1_edges = [part.edges().sort_by_distance(p)[0] for p in [
        (-52.5, 15, -31.75),
        (52.5, 15, -31.75),
        (-67.5, 12.5, -85),
        (67.5, 12.5, -85),
    ]]
    chamfer(chamfer1_edges, length=CHAMFER1_SIZE)

    # Sketch23 → Cut-Extrude12 (cut, two sides: drawn at the far end of the back side and taken through both)
    with BuildSketch(Plane(origin=(0, 0, 0), x_dir=(0, 0, -1), z_dir=(1, 0, 0)).offset(-CUT_EXTRUDE12_DEPTH_BACK)):
        with BuildLine():
            Line((9.047824987, 17.002595906), (6.975008259, 5))
            Line((6.975008259, 5), (14.75, 5))
            Line((14.75, 5), (14.75, 25))
            Line((14.75, 25), (6.724618292, 25))
            ThreePointArc((6.724618292, 25), (8.809266361, 21.269437921), (9.047824987, 17.002595906))
        make_face()
    extrude(amount=CUT_EXTRUDE12_DEPTH + CUT_EXTRUDE12_DEPTH_BACK, mode=Mode.SUBTRACT)

    # Chamfer2
    # the kernel refuses this chamfer: 16, 12 mm, written as the material it adds along each edge
    with BuildSketch(Plane(origin=(-52.5, 25, -14.75), x_dir=(0, 0, 1), z_dir=(-1, 0, 0))) as chamfer2_piece_1:
        Polygon((CHAMFER2_SIZE, 0), (0, -CHAMFER2_SIZE_2), (0, 0), align=None)
    extrude(amount=12)
    with BuildSketch(Plane(origin=(64.5, 25, -14.75), x_dir=(0, -1, 0), z_dir=(-1, 0, 0))) as chamfer2_piece_2:
        Polygon((CHAMFER2_SIZE_2, 0), (0, CHAMFER2_SIZE), (0, 0), align=None)
    extrude(amount=12)

    # Cut-Extrude14: read off the stored shape, not the designer's step
    # Cut-Extrude14 outline → Cut-Extrude14 (cut)
    with BuildSketch(Plane(origin=(0, 0, 0), x_dir=(1, 0, 0), z_dir=(0, 1, 0)).offset(CUT_EXTRUDE14_START)):
        Polygon((0, -30), (30, -30), (30, 0), (52.5, 0), (52.5, 19.75), (64.5, 31.75), (65, 31.75), (65, 71.75), (-65, 71.75), (-65, 31.75), (-64.5, 31.75), (-52.5, 19.75), (-52.5, 0), (-30, 0), (-30, -48), (10, -48), (10, -39.987492178), (0, -39.987492178), align=None)
    extrude(amount=CUT_EXTRUDE14_DEPTH, mode=Mode.SUBTRACT)

    # Cut-Extrude15: read off the stored shape, not the designer's step
    # Cut-Extrude15 outline → Cut-Extrude15 (cut)
    with BuildSketch(Plane.YZ.offset(CUT_EXTRUDE15_START)):
        with BuildLine():
            Line((-5, 30), (-3.5, 30))
            ThreePointArc((-3.5, 30), (-2.599668871, 35.291502622), (0, 39.987492178))
            Line((0, 39.987492178), (-3.5, 39.987492178))
            Line((-3.5, 39.987492178), (-3.5, 48))
            Line((-3.5, 48), (-5, 48))
            Line((-5, 48), (-5, 30))
        make_face()
    extrude(amount=CUT_EXTRUDE15_DEPTH, mode=Mode.SUBTRACT)

    # M3 Clearance Hole2 (through all)
    with Locations(Plane(origin=(0, 30, 0), x_dir=(1, 0, 0), z_dir=(0, 1, 0))):
        with Locations((-57.975, -8.931905766), (57.975, -8.931905766), (51.554615818, 75.475), (-51.554615818, 75.475)):
            Hole(M3_CLEARANCE_HOLE2_D / 2)

    # M3 Clearance Hole3 (through all)
    with Locations(Plane(origin=(0, 30, 0), x_dir=(1, 0, 0), z_dir=(0, 1, 0))):
        with Locations((-35.475, -38.475), (35.475, -38.475)):
            Hole(M3_CLEARANCE_HOLE3_D / 2)


solid = part.part
